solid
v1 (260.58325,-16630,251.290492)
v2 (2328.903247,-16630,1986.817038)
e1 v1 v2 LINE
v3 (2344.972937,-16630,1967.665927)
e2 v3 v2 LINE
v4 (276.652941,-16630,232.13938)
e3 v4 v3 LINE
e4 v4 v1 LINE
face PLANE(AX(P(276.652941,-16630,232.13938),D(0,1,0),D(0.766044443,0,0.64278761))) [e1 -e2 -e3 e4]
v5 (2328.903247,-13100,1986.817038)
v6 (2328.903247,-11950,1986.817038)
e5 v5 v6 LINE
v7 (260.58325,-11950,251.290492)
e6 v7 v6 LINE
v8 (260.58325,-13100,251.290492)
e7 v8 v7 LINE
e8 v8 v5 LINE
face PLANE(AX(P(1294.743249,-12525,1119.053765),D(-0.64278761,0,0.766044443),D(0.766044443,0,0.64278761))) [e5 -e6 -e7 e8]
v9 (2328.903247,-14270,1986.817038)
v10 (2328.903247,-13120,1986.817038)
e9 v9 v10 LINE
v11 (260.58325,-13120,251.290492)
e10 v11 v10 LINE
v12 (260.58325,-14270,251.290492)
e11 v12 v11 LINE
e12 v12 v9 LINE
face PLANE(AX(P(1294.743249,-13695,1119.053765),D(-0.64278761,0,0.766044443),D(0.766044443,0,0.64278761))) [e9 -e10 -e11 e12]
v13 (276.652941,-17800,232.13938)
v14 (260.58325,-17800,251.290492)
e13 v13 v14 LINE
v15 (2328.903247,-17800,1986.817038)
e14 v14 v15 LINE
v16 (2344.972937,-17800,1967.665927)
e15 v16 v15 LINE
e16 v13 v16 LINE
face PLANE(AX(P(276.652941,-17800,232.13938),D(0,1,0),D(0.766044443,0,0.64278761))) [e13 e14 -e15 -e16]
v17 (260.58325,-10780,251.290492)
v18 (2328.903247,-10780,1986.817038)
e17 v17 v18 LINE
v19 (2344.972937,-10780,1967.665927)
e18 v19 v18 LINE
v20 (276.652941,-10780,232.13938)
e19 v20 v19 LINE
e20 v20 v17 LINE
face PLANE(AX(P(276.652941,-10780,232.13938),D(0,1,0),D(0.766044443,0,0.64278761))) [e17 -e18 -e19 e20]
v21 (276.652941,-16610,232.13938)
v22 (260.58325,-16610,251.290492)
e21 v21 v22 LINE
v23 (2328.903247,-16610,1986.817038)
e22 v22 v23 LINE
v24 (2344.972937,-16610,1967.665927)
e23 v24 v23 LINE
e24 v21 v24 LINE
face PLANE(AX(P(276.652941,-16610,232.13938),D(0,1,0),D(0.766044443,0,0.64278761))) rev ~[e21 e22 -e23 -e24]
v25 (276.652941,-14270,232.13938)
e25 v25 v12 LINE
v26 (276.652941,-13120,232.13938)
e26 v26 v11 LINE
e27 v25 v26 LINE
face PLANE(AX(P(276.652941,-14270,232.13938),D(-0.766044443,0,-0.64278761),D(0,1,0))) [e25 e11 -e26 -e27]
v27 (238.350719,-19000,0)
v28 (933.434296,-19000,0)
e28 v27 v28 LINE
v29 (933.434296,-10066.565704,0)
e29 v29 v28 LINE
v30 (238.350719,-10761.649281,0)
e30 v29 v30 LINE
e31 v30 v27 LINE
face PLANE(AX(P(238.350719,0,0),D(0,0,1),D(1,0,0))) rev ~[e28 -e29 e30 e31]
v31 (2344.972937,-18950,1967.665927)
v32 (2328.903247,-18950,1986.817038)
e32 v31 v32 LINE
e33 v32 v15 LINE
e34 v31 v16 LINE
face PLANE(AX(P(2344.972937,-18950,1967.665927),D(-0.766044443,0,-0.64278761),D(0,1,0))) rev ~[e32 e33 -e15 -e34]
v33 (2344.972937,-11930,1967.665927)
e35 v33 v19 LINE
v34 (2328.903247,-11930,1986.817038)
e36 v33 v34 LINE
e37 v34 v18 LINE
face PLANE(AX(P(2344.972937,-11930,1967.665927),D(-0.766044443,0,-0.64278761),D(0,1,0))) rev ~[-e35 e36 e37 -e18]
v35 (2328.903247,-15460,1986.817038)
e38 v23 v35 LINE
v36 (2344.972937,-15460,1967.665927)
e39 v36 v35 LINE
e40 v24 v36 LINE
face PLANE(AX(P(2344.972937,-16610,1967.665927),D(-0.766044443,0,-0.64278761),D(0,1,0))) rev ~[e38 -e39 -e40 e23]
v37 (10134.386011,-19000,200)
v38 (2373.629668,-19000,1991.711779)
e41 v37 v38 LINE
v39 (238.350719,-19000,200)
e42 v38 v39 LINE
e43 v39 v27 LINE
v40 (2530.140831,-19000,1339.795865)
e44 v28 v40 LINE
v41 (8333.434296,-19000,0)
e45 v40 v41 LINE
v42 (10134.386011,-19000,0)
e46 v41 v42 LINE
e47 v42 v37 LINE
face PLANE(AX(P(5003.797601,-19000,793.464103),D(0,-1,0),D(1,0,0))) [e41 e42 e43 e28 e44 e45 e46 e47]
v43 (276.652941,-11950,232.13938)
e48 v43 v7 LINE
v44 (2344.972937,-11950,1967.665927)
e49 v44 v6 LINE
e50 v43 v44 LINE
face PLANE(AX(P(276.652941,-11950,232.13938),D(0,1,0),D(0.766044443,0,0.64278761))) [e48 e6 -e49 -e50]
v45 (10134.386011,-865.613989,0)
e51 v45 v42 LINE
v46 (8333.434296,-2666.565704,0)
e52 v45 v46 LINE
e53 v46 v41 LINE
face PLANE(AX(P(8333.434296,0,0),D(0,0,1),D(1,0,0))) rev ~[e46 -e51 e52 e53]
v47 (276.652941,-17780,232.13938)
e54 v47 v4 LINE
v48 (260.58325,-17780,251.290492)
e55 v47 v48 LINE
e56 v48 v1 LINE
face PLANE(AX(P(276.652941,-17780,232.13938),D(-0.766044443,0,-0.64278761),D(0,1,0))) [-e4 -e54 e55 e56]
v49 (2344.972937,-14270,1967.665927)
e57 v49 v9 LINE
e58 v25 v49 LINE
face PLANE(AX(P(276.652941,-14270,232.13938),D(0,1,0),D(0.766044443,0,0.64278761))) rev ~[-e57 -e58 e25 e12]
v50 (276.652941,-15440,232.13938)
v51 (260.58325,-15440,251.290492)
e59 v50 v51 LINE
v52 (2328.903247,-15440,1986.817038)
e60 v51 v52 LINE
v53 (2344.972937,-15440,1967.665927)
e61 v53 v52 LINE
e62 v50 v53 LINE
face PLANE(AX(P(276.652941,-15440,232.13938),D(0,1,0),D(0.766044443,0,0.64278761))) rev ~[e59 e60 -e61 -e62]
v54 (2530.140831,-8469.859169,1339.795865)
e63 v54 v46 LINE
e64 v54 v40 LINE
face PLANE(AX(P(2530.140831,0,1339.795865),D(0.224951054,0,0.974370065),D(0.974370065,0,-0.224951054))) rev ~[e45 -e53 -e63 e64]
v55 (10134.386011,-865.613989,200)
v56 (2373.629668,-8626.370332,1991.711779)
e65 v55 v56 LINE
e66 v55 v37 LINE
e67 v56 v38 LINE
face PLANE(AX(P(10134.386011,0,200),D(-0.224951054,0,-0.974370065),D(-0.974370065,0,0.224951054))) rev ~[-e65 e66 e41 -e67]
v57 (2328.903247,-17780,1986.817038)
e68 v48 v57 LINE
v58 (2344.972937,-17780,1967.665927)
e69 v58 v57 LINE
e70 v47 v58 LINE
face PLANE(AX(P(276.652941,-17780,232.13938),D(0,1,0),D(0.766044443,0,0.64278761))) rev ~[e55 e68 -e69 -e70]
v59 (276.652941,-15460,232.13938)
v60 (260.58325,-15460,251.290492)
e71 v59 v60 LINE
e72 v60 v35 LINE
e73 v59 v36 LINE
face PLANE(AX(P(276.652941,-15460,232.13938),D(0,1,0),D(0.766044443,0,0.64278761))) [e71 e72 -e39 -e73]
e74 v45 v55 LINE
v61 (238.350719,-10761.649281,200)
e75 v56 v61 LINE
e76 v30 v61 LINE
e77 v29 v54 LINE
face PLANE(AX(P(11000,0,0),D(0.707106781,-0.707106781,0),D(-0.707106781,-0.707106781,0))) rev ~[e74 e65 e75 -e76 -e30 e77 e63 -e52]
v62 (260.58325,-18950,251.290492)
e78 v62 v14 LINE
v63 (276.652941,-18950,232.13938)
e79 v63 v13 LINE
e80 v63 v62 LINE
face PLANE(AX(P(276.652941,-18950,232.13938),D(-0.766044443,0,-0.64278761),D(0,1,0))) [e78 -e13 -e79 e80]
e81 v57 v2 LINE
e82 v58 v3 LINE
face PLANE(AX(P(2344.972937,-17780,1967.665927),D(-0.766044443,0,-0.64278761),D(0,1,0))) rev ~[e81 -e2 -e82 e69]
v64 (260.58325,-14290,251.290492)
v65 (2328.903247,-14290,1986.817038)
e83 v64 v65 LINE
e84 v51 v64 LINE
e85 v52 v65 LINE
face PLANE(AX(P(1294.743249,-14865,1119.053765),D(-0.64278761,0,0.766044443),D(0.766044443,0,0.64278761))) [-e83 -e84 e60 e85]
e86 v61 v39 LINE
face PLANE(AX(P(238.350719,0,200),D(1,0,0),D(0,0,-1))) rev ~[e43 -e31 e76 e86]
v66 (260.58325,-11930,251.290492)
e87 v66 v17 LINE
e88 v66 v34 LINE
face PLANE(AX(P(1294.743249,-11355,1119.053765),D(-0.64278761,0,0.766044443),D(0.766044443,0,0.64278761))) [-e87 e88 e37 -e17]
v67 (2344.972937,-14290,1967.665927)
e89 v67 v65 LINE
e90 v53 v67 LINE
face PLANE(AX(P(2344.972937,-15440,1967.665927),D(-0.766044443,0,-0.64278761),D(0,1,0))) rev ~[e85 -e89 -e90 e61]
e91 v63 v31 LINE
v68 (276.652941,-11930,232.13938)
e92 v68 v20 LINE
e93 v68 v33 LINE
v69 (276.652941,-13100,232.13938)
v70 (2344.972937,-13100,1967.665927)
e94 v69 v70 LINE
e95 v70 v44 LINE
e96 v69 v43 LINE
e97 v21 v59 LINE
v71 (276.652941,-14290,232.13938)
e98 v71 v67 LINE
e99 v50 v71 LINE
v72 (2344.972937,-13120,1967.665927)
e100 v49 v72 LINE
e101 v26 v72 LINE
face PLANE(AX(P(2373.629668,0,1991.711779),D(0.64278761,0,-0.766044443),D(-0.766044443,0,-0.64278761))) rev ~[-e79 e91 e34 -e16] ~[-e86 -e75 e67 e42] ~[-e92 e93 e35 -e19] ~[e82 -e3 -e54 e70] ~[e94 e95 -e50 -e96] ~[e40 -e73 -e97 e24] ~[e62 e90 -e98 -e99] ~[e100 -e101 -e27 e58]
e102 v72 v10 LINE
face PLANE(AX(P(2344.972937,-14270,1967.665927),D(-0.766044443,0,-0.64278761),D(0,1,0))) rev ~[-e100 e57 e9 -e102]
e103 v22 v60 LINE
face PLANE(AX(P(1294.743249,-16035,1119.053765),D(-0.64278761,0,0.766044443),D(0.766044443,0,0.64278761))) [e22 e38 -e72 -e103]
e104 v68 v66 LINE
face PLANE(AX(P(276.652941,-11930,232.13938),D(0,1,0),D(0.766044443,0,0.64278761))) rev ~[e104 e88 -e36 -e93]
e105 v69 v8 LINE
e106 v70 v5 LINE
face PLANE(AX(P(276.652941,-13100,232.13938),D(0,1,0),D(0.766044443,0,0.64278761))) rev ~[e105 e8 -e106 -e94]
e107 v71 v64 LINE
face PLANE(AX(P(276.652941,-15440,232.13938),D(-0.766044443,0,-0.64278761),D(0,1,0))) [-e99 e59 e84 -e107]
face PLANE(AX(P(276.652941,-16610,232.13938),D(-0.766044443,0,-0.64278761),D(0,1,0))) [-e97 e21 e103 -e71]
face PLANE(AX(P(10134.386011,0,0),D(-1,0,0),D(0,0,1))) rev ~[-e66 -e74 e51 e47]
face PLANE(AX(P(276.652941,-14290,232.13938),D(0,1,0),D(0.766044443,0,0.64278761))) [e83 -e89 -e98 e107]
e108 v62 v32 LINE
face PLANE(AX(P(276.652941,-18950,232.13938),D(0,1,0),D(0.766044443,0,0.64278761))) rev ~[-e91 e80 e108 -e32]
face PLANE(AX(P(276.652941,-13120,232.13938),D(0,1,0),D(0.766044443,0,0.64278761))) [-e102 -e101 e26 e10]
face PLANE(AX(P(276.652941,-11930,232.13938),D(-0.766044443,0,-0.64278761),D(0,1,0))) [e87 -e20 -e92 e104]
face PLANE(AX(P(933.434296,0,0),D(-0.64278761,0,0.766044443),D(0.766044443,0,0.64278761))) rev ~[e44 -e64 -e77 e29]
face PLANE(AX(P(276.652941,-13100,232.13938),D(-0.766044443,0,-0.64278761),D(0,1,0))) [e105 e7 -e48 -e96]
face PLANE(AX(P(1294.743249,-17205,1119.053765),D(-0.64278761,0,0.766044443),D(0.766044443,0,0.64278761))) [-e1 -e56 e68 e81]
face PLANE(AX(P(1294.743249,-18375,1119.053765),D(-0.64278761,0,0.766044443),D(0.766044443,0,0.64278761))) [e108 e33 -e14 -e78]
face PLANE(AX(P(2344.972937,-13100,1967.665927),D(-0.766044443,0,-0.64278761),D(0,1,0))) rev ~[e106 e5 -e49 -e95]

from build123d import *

# Parameters (mm, degrees)
F1_DEPTH = 19000
F3_DEPTH = 1991.7127787042
F4_W     = 2700
F4_H     = 1150
F5_DEPTH = 25


# Not quite as in the source:
# - a feature names something its author has since deleted; it is built from what else it names


with BuildPart() as f1:
    # F0 (on Front) → F1 (new body)
    with BuildSketch(Plane.XZ):
        Polygon((2373.6296676829, 1991.7117787042), (238.3507185188, 200), (238.3507185188, 0), (933.4342961162, 0), (2530.1408313205, 1339.7958647882), (8333.4342961162, 0), (10134.3860108109, 0), (10134.3860108109, 200), align=None)
    extrude(amount=F1_DEPTH)

    # F2 (on face) → F3 (cut, through all)
    with BuildSketch(Plane(origin=(0, 0, 0), x_dir=(1, 0, 0), z_dir=(0, 0, -1))):
        Polygon((238.3507185188, 238.3507185188), (0, 0), (238.3507185188, 0), align=None)
        Polygon((238.3507185188, 11000), (0, 11000), (238.3507185188, 10761.6492814812), align=None)
        Polygon((0, 11000), (0, 0), (238.3507185188, 238.3507185188), (238.3507185188, 10761.6492814812), align=None)
        Polygon((5500, 5500), (933.4342961162, 933.4342961162), (933.4342961162, 0), (11000, 0), align=None)
        Polygon((933.4342961162, 933.4342961162), (238.3507185188, 238.3507185188), (238.3507185188, 0), (933.4342961162, 0), align=None)
        Polygon((238.3507185188, 10761.6492814812), (238.3507185188, 238.3507185188), (933.4342961162, 933.4342961162), (933.4342961162, 10066.5657038838), align=None)
        Polygon((933.4342961162, 10066.5657038838), (933.4342961162, 933.4342961162), (5500, 5500), align=None)
    extrude(amount=-F3_DEPTH, mode=Mode.SUBTRACT)

    # F4 (on face) → F5 (join)
    with BuildSketch(Plane(origin=(0, 0, 0), x_dir=(0.7660444431, 0, 0.6427876097), z_dir=(-0.6427876097, 0, 0.7660444431))):
        with Locations((1711.1447653721, -18375)):
            Rectangle(F4_W, F4_H)
        with Locations((1711.1447653721, -17205)):
            Rectangle(F4_W, F4_H)
        with Locations((1711.1447653721, -16035)):
            Rectangle(F4_W, F4_H)
        with Locations((1711.1447653721, -14865)):
            Rectangle(F4_W, F4_H)
        with Locations((1711.1447653721, -13695)):
            Rectangle(F4_W, F4_H)
        with Locations((1711.1447653721, -12525)):
            Rectangle(F4_W, F4_H)
        with Locations((1711.1447653721, -11355)):
            Rectangle(F4_W, F4_H)
    extrude(amount=F5_DEPTH)


solid = f1.part
